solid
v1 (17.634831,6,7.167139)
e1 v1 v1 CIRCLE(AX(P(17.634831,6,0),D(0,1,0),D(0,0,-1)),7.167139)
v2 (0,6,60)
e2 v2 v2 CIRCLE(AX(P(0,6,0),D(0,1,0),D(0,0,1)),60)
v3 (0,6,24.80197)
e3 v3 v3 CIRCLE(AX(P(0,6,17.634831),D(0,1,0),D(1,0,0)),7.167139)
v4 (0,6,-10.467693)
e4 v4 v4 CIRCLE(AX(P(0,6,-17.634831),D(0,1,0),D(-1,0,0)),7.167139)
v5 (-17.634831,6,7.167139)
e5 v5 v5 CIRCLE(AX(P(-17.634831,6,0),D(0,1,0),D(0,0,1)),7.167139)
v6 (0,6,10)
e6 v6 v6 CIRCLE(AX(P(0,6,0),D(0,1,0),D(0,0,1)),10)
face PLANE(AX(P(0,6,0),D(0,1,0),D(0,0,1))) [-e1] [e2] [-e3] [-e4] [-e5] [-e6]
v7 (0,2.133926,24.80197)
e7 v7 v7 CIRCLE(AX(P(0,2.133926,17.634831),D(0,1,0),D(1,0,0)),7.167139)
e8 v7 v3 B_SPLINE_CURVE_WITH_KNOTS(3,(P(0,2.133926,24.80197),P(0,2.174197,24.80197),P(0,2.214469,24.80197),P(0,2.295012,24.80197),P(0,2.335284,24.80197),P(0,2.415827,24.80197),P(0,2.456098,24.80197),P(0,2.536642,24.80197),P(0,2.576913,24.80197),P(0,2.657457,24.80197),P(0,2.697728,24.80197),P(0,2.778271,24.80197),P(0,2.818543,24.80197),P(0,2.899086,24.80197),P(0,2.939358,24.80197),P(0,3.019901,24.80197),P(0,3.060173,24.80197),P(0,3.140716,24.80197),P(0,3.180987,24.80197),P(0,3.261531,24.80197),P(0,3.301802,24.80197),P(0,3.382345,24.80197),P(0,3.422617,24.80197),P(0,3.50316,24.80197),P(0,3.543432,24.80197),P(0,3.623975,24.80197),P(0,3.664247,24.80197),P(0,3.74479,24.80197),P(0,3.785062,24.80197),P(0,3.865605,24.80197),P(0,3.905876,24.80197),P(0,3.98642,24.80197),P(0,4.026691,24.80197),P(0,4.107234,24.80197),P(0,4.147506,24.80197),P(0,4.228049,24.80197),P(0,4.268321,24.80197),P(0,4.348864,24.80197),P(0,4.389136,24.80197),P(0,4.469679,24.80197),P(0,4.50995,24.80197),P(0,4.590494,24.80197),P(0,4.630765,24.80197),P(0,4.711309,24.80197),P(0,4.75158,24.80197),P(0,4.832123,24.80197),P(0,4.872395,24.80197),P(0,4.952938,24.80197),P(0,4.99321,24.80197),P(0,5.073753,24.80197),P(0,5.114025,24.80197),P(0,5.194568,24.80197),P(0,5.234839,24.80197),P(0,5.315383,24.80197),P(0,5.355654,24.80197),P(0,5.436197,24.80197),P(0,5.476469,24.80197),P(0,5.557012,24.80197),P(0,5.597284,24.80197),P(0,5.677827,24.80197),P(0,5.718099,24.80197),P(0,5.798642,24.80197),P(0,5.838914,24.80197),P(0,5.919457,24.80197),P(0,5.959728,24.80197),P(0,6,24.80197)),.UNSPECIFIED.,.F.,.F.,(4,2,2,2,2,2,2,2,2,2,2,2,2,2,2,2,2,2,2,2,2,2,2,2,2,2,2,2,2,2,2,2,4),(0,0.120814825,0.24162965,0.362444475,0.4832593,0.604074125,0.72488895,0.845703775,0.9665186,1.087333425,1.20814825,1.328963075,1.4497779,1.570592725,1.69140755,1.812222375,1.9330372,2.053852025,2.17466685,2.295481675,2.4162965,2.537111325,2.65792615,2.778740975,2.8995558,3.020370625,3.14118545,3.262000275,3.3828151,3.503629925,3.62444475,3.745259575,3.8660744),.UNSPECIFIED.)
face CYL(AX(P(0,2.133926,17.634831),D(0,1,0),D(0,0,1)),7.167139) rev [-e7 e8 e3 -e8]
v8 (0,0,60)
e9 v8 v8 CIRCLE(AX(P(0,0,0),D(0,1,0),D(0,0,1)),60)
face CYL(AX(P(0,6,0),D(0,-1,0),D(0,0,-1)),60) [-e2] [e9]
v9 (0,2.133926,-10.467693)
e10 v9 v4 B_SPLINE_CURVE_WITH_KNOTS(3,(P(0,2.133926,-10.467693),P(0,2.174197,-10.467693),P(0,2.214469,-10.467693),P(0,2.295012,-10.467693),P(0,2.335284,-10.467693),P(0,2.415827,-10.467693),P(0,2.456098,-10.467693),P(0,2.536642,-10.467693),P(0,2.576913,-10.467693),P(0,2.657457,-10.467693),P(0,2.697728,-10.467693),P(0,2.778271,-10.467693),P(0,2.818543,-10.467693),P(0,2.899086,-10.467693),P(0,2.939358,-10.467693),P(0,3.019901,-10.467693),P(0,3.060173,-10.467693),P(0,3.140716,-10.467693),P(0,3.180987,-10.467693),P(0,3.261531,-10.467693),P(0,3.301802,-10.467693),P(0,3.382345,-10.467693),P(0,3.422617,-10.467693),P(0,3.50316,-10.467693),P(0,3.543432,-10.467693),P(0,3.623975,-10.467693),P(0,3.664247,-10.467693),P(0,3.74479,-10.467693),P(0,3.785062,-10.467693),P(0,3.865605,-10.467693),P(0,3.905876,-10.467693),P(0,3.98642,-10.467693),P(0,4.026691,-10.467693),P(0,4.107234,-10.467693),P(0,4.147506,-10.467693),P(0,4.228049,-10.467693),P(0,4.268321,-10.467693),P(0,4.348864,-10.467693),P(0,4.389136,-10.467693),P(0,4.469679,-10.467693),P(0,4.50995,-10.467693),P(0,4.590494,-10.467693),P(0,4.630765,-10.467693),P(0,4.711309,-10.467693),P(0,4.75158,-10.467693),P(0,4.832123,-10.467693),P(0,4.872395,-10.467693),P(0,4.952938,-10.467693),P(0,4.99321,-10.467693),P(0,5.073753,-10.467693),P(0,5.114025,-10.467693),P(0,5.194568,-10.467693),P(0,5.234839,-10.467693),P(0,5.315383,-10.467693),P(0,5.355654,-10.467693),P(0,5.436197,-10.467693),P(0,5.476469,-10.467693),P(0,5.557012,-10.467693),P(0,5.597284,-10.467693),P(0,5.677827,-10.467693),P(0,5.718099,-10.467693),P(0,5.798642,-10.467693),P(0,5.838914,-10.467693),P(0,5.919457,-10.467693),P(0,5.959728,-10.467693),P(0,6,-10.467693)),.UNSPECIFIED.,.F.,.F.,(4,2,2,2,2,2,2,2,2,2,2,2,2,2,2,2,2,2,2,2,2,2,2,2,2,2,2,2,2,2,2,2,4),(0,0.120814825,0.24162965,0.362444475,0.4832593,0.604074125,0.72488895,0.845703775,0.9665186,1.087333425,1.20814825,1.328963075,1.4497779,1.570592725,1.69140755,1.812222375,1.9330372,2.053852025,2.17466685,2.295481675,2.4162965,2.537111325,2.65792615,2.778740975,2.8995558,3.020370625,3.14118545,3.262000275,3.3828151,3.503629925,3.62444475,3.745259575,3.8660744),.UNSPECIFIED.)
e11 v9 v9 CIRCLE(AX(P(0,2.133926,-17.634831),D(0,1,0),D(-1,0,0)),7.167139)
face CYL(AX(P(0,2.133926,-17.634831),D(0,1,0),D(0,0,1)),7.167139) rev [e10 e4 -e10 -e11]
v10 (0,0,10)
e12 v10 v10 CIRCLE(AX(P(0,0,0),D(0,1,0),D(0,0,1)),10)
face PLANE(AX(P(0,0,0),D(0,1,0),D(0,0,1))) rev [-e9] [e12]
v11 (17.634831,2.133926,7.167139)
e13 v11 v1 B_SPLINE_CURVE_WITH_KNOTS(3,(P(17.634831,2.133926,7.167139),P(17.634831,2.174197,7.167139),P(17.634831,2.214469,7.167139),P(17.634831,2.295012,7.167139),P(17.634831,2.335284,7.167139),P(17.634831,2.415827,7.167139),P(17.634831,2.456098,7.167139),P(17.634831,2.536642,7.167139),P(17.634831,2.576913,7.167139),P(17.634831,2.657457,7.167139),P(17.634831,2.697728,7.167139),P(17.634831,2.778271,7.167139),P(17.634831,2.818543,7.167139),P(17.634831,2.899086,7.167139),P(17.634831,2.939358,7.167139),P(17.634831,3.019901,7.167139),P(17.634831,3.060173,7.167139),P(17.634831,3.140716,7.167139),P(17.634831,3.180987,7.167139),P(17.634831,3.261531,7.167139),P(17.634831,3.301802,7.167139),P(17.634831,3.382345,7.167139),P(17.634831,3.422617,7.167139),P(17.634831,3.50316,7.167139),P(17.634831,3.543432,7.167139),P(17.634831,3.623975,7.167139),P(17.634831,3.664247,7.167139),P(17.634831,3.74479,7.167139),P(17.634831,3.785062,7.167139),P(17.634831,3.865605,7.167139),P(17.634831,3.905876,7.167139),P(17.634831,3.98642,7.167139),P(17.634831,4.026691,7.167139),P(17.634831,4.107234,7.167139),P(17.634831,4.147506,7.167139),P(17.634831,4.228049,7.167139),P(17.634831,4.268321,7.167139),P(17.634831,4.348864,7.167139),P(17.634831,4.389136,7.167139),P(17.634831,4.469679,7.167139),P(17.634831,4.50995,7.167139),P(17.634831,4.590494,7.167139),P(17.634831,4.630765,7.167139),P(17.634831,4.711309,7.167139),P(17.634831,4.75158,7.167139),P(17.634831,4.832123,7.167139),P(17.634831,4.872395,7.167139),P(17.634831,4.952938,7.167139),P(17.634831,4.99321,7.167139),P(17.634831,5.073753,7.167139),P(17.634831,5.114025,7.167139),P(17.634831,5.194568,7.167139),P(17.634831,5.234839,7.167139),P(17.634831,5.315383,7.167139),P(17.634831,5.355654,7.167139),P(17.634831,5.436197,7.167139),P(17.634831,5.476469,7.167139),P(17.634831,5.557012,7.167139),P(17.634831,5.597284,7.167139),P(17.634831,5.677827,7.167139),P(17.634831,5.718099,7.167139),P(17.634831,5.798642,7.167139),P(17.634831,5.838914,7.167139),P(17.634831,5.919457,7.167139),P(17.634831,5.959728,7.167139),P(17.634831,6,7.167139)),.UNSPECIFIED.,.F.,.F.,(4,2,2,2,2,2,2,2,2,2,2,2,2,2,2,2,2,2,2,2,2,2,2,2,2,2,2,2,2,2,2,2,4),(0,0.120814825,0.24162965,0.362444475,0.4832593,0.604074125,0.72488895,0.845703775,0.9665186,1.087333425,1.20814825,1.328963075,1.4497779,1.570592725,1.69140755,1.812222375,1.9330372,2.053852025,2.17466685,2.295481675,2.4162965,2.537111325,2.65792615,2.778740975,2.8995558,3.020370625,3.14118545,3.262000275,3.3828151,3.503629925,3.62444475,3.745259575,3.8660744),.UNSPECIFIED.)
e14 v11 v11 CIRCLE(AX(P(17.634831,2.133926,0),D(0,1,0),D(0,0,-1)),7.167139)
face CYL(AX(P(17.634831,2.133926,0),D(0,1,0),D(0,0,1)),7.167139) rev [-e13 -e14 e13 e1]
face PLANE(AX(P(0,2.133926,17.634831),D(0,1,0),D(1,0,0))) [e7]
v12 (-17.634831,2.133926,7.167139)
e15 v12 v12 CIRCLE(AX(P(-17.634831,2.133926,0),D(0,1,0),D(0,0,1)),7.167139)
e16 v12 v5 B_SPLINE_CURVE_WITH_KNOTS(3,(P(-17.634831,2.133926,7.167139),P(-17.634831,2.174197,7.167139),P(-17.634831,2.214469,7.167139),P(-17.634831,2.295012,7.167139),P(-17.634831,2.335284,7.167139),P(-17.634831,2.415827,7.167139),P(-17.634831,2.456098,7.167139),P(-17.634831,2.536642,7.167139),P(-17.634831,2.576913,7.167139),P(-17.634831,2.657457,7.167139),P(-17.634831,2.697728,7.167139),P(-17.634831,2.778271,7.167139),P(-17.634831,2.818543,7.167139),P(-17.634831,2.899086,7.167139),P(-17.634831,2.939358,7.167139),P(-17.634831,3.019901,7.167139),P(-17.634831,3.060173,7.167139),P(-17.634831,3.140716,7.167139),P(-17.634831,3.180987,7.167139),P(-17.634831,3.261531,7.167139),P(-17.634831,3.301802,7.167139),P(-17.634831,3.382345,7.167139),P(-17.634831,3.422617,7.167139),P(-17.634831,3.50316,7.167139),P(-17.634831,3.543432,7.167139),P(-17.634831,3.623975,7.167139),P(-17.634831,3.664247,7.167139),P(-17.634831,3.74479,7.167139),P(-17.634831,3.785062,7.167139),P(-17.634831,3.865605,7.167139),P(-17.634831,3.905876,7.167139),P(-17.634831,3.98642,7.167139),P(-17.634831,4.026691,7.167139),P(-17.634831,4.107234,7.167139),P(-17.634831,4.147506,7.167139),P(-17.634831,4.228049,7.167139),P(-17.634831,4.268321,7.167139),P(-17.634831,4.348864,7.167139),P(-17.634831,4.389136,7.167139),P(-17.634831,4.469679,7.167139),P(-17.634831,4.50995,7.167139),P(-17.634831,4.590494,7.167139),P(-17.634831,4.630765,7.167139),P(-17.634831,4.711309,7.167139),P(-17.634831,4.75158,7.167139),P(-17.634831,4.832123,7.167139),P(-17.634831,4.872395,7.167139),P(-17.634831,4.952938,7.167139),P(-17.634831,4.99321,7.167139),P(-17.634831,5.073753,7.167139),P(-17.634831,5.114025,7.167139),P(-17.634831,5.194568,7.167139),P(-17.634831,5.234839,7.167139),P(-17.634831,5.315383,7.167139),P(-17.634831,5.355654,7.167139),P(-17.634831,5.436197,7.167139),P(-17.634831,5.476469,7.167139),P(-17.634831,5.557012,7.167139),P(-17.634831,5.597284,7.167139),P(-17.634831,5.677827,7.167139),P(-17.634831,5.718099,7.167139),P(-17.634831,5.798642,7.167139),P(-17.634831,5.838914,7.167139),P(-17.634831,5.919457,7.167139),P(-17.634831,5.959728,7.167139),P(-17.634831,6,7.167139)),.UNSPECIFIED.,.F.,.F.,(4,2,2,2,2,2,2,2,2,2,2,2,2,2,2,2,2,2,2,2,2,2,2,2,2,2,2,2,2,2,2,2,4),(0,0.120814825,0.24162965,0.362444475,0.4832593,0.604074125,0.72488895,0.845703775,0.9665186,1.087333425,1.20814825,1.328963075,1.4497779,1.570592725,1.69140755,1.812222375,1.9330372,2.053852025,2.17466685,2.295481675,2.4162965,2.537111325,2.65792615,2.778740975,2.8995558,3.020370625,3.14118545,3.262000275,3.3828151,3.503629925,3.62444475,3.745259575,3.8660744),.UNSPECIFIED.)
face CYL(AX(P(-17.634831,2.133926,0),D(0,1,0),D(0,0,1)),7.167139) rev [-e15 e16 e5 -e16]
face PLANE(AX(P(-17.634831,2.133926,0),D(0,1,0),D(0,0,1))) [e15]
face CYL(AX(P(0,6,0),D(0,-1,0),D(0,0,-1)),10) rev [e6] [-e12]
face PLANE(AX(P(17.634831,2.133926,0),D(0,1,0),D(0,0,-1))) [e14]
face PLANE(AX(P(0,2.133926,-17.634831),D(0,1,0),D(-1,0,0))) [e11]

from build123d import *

# Parameters (mm, degrees)
SKETCH1_R           = 60
BOSS_EXTRUDE1_DEPTH = 6
SKETCH2_R           = 10
CUT_EXTRUDE1_DEPTH  = 86.064681273
SKETCH3_R           = 7.167138737
CUT_EXTRUDE2_DEPTH  = 3.8660744
CIRPATTERN1_COUNT   = 4


with BuildPart() as part:
    # Sketch1 → Boss-Extrude1 (new body)
    with BuildSketch(Plane(origin=(0, 0, 0), x_dir=(1, 0, 0), z_dir=(0, 1, 0))):
        Circle(SKETCH1_R)
    extrude(amount=BOSS_EXTRUDE1_DEPTH)

    # Sketch2 → Cut-Extrude1 (cut, through all)
    with BuildSketch(Plane(origin=(0, 0, 0), x_dir=(1, 0, 0), z_dir=(0, 1, 0))):
        Circle(SKETCH2_R)
    extrude(amount=CUT_EXTRUDE1_DEPTH, mode=Mode.SUBTRACT)

    # Sketch3 → Cut-Extrude2 (cut)
    with BuildSketch(Plane(origin=(0, 6, 0), x_dir=(1, 0, 0), z_dir=(0, 1, 0))):
        with Locations((-17.634831482, 0)):
            Circle(SKETCH3_R)
    cut_extrude2 = extrude(amount=-CUT_EXTRUDE2_DEPTH, mode=Mode.SUBTRACT)

    # CirPattern1: Cut-Extrude2 ×4 about axis
    cirpattern1_axis = Axis((0, 0, 0), (0, 1, 0))
    for i in range(1, CIRPATTERN1_COUNT):
        add(cut_extrude2.rotate(cirpattern1_axis, i * 360 / CIRPATTERN1_COUNT), mode=Mode.SUBTRACT)


solid = part.part
